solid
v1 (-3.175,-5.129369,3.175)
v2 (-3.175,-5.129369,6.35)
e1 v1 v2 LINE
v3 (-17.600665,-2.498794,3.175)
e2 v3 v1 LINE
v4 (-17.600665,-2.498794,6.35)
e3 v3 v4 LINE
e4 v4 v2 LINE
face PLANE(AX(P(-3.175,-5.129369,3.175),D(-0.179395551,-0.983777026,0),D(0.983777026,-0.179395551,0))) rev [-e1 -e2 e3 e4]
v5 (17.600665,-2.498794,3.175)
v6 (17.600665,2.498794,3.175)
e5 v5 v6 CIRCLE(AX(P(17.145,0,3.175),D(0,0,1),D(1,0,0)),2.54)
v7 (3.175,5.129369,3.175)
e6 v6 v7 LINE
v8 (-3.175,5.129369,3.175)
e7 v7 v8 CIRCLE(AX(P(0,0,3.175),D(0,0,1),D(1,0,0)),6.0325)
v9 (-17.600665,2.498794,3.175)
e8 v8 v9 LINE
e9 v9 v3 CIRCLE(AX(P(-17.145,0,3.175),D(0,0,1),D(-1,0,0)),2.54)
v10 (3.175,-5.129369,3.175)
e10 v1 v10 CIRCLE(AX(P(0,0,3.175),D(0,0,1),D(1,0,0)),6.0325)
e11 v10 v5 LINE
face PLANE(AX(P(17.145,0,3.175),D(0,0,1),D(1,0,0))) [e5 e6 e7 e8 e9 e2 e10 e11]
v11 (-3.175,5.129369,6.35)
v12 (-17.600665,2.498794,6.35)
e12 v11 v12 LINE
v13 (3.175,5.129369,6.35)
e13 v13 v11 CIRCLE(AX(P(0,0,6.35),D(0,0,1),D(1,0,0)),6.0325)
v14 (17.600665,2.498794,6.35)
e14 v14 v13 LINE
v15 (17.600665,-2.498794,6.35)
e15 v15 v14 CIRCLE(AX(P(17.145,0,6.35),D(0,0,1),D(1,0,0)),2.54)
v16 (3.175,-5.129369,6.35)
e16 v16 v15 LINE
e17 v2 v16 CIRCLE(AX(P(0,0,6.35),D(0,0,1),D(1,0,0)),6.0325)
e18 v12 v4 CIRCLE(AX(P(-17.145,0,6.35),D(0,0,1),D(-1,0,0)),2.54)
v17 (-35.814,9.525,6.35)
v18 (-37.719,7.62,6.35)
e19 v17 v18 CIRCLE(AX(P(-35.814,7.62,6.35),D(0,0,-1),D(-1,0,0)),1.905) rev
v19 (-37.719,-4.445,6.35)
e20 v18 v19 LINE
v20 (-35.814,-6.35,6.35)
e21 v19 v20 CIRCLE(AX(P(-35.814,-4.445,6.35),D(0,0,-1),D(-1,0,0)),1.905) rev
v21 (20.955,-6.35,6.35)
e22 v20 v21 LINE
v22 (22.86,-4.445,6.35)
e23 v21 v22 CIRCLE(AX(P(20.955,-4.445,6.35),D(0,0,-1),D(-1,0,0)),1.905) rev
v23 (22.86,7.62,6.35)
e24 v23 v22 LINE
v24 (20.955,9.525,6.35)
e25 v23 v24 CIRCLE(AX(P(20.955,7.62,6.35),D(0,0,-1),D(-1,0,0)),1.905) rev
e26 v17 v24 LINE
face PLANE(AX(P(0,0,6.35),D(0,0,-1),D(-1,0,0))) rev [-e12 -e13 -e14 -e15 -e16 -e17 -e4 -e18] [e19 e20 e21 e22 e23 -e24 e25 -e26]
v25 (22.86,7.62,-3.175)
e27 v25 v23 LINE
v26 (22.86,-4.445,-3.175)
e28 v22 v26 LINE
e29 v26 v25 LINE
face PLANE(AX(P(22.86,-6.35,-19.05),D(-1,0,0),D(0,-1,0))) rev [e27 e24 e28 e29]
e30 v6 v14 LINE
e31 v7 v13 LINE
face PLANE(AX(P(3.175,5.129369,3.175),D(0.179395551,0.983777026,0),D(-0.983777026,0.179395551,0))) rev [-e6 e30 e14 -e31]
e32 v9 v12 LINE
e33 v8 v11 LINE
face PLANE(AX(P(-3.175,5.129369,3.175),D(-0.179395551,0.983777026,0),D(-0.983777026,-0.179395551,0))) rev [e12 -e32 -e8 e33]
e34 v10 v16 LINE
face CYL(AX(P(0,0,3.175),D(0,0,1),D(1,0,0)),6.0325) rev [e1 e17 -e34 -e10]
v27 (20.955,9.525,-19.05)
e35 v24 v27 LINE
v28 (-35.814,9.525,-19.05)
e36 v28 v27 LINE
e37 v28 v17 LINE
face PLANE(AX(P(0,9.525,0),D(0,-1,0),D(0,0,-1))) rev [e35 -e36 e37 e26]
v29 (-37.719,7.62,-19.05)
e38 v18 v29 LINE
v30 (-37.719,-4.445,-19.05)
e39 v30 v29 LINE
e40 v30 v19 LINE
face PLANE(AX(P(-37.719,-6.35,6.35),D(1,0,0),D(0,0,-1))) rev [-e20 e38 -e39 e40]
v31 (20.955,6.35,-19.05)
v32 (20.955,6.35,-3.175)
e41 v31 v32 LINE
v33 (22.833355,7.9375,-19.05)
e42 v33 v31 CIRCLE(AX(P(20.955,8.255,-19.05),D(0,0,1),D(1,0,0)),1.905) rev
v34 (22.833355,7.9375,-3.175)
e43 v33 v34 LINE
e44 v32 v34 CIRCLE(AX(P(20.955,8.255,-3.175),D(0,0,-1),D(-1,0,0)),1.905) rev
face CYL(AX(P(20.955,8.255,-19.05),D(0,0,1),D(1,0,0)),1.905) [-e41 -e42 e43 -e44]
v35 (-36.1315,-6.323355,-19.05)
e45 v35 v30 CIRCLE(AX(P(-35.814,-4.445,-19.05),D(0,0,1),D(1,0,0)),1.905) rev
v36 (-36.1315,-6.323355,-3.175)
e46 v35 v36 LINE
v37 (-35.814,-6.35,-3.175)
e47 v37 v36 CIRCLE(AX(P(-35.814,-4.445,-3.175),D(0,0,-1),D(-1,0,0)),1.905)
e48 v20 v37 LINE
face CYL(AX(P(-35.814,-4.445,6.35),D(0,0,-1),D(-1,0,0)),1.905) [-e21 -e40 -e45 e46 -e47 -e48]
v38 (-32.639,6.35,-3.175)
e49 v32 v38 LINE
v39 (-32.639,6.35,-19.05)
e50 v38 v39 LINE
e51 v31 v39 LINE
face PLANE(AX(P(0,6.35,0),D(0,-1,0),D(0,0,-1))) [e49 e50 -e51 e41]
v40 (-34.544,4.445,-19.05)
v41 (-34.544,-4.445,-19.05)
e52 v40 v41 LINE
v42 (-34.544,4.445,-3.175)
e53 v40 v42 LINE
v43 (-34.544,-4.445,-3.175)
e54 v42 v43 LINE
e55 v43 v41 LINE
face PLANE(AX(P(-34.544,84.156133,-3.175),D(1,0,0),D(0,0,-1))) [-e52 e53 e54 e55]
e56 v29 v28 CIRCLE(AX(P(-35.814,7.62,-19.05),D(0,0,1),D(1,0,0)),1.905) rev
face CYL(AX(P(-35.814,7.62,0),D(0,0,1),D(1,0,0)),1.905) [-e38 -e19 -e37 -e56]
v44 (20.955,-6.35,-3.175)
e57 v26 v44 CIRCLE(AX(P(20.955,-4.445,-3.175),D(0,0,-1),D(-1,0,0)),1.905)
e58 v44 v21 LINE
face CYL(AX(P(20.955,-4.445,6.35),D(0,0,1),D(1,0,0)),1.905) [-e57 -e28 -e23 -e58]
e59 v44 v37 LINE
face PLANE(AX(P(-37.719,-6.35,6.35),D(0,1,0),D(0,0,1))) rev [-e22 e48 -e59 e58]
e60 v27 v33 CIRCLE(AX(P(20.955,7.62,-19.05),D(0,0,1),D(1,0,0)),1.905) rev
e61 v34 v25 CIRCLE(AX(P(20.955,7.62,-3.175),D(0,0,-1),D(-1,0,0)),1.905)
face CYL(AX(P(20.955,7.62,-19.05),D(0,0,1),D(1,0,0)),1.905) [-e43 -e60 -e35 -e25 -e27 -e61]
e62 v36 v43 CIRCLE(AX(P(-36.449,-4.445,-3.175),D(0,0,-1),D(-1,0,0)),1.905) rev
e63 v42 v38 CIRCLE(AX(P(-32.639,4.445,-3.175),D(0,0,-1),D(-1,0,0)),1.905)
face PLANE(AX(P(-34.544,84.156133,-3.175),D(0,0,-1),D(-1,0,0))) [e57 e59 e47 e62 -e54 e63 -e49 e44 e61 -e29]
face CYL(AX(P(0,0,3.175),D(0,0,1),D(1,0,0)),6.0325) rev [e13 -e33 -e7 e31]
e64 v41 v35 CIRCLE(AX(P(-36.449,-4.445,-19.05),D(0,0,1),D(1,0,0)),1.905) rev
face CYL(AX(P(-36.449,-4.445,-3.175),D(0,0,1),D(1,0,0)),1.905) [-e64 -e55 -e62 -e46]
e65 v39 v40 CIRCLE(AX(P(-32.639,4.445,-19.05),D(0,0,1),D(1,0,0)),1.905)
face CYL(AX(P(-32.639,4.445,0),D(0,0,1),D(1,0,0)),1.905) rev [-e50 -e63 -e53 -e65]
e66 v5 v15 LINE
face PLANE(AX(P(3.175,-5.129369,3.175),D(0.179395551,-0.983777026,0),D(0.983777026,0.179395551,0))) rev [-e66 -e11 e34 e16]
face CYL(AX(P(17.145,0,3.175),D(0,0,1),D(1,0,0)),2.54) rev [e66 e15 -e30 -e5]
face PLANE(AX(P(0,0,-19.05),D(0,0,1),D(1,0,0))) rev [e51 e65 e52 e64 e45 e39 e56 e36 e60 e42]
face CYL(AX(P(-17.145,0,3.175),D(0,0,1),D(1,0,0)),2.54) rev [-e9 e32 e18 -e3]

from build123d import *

# Parameters (mm, degrees)
SKETCH1_W                       = 75.438
SKETCH1_H                       = 12.7
BOSS_EXTRUDE1_DEPTH             = 6.35
CUT_EXTRUDE1_DEPTH              = 3.175
BOSS_EXTRUDE2_REACH             = 40.773
SKETCH3_W                       = 75.438
SKETCH3_H                       = 19.05
SKETCH3_W_2                     = 69.088
SKETCH3_H_2                     = 12.7
BOSS_EXTRUDE2_DIRECTION_2_REACH = 40.773
SKETCH4_W                       = 75.438
SKETCH4_H                       = 25.4
BOSS_EXTRUDE4_DEPTH             = 3.175
SKETCH7_W                       = 14.859
SKETCH7_H                       = 15.875
CUT_EXTRUDE3_DEPTH              = 47.460828512
SKETCH8_W                       = 3.175
SKETCH8_H                       = 15.875
CUT_EXTRUDE4_DEPTH              = 65.214043371
BOSS_EXTRUDE5_DEPTH             = 3.175
FILLET2_R                       = 1.905


with BuildPart() as part:
    # Sketch1 → Boss-Extrude1 (new body)
    with BuildSketch(Plane.XY):
        Rectangle(SKETCH1_W, SKETCH1_H)
    extrude(amount=BOSS_EXTRUDE1_DEPTH)

    # Sketch2 → Cut-Extrude1 (cut)
    with BuildSketch(Plane.XY.offset(6.35)):
        with BuildLine():
            Line((3.175, 5.129369479), (17.6006647, 2.498793645))
            ThreePointArc((17.6006647, 2.498793645), (19.685, 0), (17.6006647, -2.498793645))
            Line((17.6006647, -2.498793645), (3.175, -5.129369479))
            ThreePointArc((3.175, -5.129369479), (0, -6.0325), (-3.175, -5.129369479))
            Line((-3.175, -5.129369479), (-17.6006647, -2.498793645))
            ThreePointArc((-17.6006647, -2.498793645), (-19.685, 0), (-17.6006647, 2.498793645))
            Line((-17.6006647, 2.498793645), (-3.175, 5.129369479))
            ThreePointArc((-3.175, 5.129369479), (0, 6.0325), (3.175, 5.129369479))
        make_face()
    extrude(amount=-CUT_EXTRUDE1_DEPTH, mode=Mode.SUBTRACT)

    # Boss-Extrude2: up to this face of the body (flat: up to its plane)
    boss_extrude2_end = Plane(part.part.faces().sort_by_distance((0, 6.35, 3.175))[0])
    # Sketch3 → Boss-Extrude2 (add, up to the picked face)
    with BuildSketch(Plane(origin=(0, 0, 0), x_dir=(1, 0, 0), z_dir=(0, 1, 0)), mode=Mode.PRIVATE) as boss_extrude2_sk1:
        with Locations((0, 9.525)):
            Rectangle(SKETCH3_W, SKETCH3_H)
        with Locations((0, 9.525)):
            Rectangle(SKETCH3_W_2, SKETCH3_H_2, mode=Mode.SUBTRACT)
    boss_extrude2_tool1 = split(extrude(boss_extrude2_sk1.sketch, amount=BOSS_EXTRUDE2_REACH, mode=Mode.PRIVATE), bisect_by=boss_extrude2_end, keep=Keep.BOTH, mode=Mode.PRIVATE)
    add(boss_extrude2_tool1.solids().sort_by(Axis((0, 0, -0.778061), (0, 1, 0)))[0])

    # Boss-Extrude2 direction 2: up to this face of the body (flat: up to its plane)
    boss_extrude2_direction_2_end = Plane(part.part.faces().sort_by_distance((0, -6.35, 3.175))[0])
    # Sketch3 → Boss-Extrude2 direction 2 (add, up to the picked face)
    with BuildSketch(Plane(origin=(0, 0, 0), x_dir=(1, 0, 0), z_dir=(0, 1, 0)), mode=Mode.PRIVATE) as boss_extrude2_direction_2_sk1:
        with Locations((0, 9.525)):
            Rectangle(SKETCH3_W, SKETCH3_H)
        with Locations((0, 9.525)):
            Rectangle(SKETCH3_W_2, SKETCH3_H_2, mode=Mode.SUBTRACT)
    boss_extrude2_direction_2_tool1 = split(extrude(boss_extrude2_direction_2_sk1.sketch, amount=-BOSS_EXTRUDE2_DIRECTION_2_REACH, mode=Mode.PRIVATE), bisect_by=boss_extrude2_direction_2_end, keep=Keep.BOTH, mode=Mode.PRIVATE)
    add(boss_extrude2_direction_2_tool1.solids().sort_by(Axis((0, 0, -0.778061), (0, -1, 0)))[0])

    # Sketch4 → Boss-Extrude4 (add)
    with BuildSketch(Plane(origin=(0, 6.35, 0), x_dir=(1, 0, 0), z_dir=(0, 1, 0))):
        with Locations((0, 6.35)):
            Rectangle(SKETCH4_W, SKETCH4_H)
    extrude(amount=BOSS_EXTRUDE4_DEPTH)

    # Sketch7 → Cut-Extrude3 (cut, through all)
    with BuildSketch(Plane.XY.offset(6.35)):
        with Locations((30.2895, 1.5875)):
            Rectangle(SKETCH7_W, SKETCH7_H)
    extrude(amount=-CUT_EXTRUDE3_DEPTH, mode=Mode.SUBTRACT)

    # Sketch8 → Cut-Extrude4 (cut, through all)
    with BuildSketch(Plane(origin=(22.86, 0, 0), x_dir=(0, 0, -1), z_dir=(1, 0, 0))):
        with Locations((17.4625, 1.5875)):
            Rectangle(SKETCH8_W, SKETCH8_H)
    extrude(amount=-CUT_EXTRUDE4_DEPTH, mode=Mode.SUBTRACT)

    # Sketch9 → Boss-Extrude5 (add)
    with BuildSketch(Plane(origin=(0, 0, -15.875), x_dir=(-1, 0, 0), z_dir=(0, 0, -1))):
        Polygon((34.544, 6.35), (34.544, -6.35), (37.719, -6.35), (37.719, 9.525), (-22.86, 9.525), (-22.86, 6.35), align=None)
    extrude(amount=BOSS_EXTRUDE5_DEPTH)

    # Fillet2
    # the kernel refuses this fillet: 1.905 mm, written as the material it adds along each edge
    with BuildSketch(Plane(origin=(-34.544, 6.35, 1.5875), x_dir=(0, -1, 0), z_dir=(0, 0, -1))) as fillet2_piece_1:
        with BuildLine():
            CenterArc((FILLET2_R, -FILLET2_R), FILLET2_R, 90, 90)
            Line((0, -FILLET2_R), (0, 0))
            Line((0, 0), (FILLET2_R, 0))
        make_face()
    extrude(amount=20.6375)
    # the kernel refuses this fillet: 1.905 mm, written as the material it takes off along each edge
    with BuildSketch(Plane(origin=(-37.719, 9.525, 11.1125), x_dir=(0, -1, 0), z_dir=(0, 0, -1)), Plane(origin=(-37.719, -6.35, 11.1125), x_dir=(1, 0, 0), z_dir=(0, 0, -1))) as fillet2_2_piece_1:
        with BuildLine():
            CenterArc((FILLET2_R, -FILLET2_R), FILLET2_R, 90, 90)
            Line((0, -FILLET2_R), (0, 0))
            Line((0, 0), (FILLET2_R, 0))
        make_face()
    extrude(amount=34.925, mode=Mode.SUBTRACT)
    with BuildSketch(Plane(origin=(-34.544, -6.35, -3.175), x_dir=(0, 1, 0), z_dir=(0, 0, -1))) as fillet2_2_piece_2:
        with BuildLine():
            CenterArc((FILLET2_R, -FILLET2_R), FILLET2_R, 90, 90)
            Line((0, -FILLET2_R), (0, 0))
            Line((0, 0), (FILLET2_R, 0))
        make_face()
    extrude(amount=20.6375, mode=Mode.SUBTRACT)
    with BuildSketch(Plane(origin=(22.86, 6.35, -23.8125), x_dir=(0, 1, 0), z_dir=(0, 0, 1))) as fillet2_2_piece_3:
        with BuildLine():
            CenterArc((FILLET2_R, FILLET2_R), FILLET2_R, 180, 90)
            Line((0, FILLET2_R), (0, 0))
            Line((0, 0), (FILLET2_R, 0))
        make_face()
    extrude(amount=20.6375, mode=Mode.SUBTRACT)
    with BuildSketch(Plane(origin=(22.86, 9.525, -23.8125), x_dir=(-1, 0, 0), z_dir=(0, 0, 1))) as fillet2_2_piece_4:
        with BuildLine():
            CenterArc((FILLET2_R, FILLET2_R), FILLET2_R, 180, 90)
            Line((0, FILLET2_R), (0, 0))
            Line((0, 0), (FILLET2_R, 0))
        make_face()
    extrude(amount=34.925, mode=Mode.SUBTRACT)
    with BuildSketch(Plane(origin=(22.86, -6.35, 11.1125), x_dir=(-1, 0, 0), z_dir=(0, 0, -1))) as fillet2_2_piece_5:
        with BuildLine():
            CenterArc((FILLET2_R, FILLET2_R), FILLET2_R, 180, 90)
            Line((0, FILLET2_R), (0, 0))
            Line((0, 0), (FILLET2_R, 0))
        make_face()
    extrude(amount=19.05, mode=Mode.SUBTRACT)


solid = part.part
